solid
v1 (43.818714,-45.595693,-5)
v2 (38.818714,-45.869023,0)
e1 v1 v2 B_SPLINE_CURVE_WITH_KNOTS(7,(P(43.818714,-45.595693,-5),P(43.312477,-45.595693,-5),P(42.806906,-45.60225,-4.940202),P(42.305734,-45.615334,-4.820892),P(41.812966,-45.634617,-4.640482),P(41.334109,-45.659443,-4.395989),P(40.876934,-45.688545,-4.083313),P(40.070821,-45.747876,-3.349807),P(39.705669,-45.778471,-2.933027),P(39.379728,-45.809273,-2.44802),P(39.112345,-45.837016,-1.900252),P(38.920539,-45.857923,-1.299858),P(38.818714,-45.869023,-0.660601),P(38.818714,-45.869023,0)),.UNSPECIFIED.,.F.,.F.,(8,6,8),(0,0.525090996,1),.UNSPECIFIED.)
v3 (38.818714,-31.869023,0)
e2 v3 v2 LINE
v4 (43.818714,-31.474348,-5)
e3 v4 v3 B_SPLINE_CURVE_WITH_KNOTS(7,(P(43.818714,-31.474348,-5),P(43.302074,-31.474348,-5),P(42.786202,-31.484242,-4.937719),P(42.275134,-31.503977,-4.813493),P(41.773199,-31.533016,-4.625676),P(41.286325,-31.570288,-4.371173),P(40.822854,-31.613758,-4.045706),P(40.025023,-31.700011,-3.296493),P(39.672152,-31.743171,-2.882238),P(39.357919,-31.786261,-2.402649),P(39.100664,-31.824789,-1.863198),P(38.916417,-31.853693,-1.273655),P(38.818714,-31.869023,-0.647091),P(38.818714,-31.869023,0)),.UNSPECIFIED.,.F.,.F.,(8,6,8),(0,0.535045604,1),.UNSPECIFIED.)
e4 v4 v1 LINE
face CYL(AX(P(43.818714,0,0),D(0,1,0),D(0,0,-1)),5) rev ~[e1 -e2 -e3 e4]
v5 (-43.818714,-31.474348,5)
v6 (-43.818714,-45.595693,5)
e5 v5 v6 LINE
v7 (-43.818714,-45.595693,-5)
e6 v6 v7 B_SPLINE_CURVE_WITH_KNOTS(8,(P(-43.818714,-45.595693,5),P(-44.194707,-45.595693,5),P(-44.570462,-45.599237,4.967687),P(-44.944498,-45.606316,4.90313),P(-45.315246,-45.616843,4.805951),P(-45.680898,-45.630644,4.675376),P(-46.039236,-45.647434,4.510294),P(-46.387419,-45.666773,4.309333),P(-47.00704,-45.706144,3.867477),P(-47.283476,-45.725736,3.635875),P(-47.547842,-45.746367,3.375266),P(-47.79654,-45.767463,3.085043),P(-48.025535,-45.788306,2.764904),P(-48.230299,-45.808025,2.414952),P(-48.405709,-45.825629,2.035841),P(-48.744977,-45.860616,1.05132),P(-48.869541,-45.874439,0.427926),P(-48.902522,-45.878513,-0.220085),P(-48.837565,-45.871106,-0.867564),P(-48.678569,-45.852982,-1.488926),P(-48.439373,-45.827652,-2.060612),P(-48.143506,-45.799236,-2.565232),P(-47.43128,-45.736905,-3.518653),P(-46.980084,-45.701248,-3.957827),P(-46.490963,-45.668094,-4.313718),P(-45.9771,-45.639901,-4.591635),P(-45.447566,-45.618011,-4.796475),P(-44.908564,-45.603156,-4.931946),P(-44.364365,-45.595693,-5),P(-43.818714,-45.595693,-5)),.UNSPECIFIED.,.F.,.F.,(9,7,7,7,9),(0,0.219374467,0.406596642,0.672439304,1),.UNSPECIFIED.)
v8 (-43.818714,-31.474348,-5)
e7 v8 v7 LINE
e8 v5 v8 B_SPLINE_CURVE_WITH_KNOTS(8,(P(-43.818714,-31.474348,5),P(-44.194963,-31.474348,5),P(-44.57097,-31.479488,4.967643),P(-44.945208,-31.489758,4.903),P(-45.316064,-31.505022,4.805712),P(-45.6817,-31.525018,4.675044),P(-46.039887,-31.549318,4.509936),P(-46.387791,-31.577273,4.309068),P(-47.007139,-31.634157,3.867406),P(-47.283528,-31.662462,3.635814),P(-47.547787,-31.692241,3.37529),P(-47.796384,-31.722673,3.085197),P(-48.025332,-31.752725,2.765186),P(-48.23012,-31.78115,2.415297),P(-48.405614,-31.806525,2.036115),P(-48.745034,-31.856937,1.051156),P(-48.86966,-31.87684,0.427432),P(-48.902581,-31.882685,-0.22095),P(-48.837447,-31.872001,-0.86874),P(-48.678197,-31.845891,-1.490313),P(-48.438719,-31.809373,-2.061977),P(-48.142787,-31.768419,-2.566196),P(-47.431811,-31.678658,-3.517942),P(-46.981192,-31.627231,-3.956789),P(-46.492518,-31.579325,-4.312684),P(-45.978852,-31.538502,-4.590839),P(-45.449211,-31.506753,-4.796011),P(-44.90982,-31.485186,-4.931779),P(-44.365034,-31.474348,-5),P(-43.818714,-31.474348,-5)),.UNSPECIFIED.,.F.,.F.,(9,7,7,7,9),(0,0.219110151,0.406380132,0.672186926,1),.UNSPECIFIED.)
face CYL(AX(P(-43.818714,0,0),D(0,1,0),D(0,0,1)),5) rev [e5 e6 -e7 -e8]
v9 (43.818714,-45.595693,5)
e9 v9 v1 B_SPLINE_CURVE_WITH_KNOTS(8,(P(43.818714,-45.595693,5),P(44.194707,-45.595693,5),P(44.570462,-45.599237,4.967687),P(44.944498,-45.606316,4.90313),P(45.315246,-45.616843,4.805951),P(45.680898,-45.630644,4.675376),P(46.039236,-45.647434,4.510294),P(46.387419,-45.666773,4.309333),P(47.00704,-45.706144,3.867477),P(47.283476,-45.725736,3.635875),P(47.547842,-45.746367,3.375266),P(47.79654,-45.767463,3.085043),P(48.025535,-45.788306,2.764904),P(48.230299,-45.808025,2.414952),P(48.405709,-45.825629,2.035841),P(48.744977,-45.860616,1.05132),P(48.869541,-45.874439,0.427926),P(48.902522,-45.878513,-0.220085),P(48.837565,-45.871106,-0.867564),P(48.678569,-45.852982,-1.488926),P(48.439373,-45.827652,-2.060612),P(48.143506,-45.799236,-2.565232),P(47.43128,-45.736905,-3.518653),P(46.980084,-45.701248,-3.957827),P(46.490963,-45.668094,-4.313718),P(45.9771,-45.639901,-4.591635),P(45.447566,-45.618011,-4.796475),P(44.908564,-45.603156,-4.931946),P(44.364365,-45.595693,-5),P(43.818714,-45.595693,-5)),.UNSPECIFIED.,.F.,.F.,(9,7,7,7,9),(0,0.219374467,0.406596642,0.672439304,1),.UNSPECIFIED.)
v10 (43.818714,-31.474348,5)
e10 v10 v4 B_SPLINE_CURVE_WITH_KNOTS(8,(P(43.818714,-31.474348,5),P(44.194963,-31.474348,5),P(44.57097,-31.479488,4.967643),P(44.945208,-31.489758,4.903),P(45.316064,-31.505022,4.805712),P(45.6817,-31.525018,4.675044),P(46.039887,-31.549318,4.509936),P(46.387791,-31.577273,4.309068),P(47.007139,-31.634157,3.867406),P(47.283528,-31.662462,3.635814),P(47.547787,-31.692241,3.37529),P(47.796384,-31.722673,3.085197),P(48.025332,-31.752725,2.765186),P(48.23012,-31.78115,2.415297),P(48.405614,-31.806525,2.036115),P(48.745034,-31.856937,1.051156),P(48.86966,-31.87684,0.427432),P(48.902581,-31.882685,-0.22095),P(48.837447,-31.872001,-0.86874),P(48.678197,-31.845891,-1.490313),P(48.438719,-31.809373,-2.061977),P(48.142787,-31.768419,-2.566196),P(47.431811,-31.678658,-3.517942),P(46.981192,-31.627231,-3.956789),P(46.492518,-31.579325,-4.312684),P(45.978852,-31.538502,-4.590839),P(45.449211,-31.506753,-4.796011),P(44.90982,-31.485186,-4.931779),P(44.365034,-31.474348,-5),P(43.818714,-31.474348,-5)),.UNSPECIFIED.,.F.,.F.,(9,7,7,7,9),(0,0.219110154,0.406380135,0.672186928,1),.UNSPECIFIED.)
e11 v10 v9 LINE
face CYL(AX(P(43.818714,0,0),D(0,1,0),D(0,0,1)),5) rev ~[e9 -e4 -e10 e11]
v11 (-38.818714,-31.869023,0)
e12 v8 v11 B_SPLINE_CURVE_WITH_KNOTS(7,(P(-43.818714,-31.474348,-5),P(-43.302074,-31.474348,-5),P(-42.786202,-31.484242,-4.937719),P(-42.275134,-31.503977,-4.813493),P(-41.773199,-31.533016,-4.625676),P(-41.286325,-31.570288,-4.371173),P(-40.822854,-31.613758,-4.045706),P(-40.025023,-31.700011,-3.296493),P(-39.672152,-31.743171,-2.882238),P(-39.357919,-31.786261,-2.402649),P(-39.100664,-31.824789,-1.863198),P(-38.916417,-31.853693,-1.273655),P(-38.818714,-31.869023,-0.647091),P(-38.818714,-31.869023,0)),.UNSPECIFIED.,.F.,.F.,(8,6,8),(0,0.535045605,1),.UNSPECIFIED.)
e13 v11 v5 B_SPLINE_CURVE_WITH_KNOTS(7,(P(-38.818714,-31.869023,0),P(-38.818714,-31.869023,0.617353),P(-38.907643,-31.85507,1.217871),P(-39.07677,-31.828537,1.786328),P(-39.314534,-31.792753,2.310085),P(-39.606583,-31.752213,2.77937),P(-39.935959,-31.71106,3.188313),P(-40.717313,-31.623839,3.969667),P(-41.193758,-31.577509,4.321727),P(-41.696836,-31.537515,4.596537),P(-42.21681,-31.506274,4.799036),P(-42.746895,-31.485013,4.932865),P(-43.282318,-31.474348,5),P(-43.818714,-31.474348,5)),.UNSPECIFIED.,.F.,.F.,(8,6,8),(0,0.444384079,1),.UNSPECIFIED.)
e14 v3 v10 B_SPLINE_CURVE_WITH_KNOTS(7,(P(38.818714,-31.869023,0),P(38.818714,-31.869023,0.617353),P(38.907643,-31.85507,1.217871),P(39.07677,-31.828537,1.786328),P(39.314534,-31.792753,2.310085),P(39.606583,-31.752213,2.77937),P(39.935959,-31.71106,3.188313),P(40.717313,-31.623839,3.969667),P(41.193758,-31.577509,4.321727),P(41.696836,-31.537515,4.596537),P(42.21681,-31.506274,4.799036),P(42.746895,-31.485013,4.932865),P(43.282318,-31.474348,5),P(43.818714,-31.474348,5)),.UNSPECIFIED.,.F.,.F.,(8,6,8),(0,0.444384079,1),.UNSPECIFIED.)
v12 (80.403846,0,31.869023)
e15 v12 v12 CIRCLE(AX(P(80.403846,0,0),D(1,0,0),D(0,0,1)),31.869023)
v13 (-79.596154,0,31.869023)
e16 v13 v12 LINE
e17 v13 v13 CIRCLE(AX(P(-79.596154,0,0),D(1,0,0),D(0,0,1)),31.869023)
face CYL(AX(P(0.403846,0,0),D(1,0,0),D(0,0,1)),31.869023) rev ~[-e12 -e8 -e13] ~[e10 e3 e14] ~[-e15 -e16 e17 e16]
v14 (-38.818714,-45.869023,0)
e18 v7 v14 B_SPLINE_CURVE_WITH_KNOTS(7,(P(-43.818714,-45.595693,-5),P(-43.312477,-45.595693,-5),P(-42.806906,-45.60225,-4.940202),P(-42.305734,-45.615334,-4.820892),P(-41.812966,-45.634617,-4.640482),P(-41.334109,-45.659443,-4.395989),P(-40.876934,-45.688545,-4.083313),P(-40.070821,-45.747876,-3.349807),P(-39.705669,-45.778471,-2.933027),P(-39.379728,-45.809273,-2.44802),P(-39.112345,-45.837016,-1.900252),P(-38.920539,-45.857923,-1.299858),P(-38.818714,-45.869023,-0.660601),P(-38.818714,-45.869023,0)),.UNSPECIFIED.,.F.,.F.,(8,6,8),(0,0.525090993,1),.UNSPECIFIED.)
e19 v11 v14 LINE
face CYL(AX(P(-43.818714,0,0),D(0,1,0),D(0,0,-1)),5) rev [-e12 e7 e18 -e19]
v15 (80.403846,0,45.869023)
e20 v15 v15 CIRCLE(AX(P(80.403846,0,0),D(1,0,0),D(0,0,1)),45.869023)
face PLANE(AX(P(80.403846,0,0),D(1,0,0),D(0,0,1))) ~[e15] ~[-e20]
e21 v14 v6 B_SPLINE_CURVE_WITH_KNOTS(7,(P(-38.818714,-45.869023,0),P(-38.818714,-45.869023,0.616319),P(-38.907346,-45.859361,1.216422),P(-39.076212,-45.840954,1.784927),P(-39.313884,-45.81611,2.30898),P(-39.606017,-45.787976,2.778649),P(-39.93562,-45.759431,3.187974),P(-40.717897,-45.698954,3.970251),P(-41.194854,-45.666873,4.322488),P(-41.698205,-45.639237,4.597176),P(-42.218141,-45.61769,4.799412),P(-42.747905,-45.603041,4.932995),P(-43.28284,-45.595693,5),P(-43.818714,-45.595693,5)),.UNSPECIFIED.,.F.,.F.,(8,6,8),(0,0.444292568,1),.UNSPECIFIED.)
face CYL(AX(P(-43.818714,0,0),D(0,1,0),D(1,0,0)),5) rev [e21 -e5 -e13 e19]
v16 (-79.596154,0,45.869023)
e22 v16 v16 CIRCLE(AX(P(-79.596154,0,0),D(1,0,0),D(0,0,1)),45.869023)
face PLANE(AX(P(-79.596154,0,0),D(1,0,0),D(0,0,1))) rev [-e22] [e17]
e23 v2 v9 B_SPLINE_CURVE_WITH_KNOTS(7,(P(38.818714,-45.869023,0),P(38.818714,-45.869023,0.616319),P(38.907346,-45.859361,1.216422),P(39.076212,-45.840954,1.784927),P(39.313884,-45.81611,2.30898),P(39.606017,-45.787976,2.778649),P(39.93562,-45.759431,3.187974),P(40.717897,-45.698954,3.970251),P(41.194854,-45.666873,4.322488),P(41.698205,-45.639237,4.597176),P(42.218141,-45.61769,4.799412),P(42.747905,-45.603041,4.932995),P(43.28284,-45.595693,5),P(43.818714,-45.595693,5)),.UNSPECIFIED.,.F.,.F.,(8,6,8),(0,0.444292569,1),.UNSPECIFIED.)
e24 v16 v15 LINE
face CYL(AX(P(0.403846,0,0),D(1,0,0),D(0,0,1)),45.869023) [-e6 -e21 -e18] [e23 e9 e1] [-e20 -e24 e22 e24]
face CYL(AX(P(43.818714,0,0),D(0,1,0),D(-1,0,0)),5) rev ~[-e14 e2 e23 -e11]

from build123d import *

# Parameters (mm, degrees)
F0_W     = 160
F0_H     = 14
F3_DEPTH = 45.8700225313


# Not quite as in the source:
# - the program builds the solid bodies; features that only make, move or delete a surface that nothing else refers to are left out


with BuildPart() as f1:
    # F0 (on Front) → F1 (revolve)
    with BuildSketch(Plane.XZ):
        with Locations((0.4038456827, 38.8690225313)):
            Rectangle(F0_W, F0_H)
    revolve(axis=Axis((59.6884675324, 0, 0), (1, 0, 0)))

    # F2 (on Front) → F3 (cut, through all)
    with BuildSketch(Plane.XZ):
        with BuildLine():
            ThreePointArc((-38.8187138988, 0), (-40.2831799929, 3.5355339059), (-43.8187138988, 5))
            Line((-43.8187138988, 5), (-43.8187138988, -5))
            ThreePointArc((-43.8187138988, -5), (-40.2831799929, -3.5355339059), (-38.8187138988, 0))
        make_face()
        with BuildLine():
            Line((-43.8187138988, -5), (-43.8187138988, 5))
            ThreePointArc((-43.8187138988, 5), (-48.8187138988, 0), (-43.8187138988, -5))
        make_face()
    f3 = extrude(amount=F3_DEPTH, mode=Mode.SUBTRACT)

    # F4: F3 across plane
    add(f3.mirror(Plane.YZ), mode=Mode.SUBTRACT)


solid = f1.part
